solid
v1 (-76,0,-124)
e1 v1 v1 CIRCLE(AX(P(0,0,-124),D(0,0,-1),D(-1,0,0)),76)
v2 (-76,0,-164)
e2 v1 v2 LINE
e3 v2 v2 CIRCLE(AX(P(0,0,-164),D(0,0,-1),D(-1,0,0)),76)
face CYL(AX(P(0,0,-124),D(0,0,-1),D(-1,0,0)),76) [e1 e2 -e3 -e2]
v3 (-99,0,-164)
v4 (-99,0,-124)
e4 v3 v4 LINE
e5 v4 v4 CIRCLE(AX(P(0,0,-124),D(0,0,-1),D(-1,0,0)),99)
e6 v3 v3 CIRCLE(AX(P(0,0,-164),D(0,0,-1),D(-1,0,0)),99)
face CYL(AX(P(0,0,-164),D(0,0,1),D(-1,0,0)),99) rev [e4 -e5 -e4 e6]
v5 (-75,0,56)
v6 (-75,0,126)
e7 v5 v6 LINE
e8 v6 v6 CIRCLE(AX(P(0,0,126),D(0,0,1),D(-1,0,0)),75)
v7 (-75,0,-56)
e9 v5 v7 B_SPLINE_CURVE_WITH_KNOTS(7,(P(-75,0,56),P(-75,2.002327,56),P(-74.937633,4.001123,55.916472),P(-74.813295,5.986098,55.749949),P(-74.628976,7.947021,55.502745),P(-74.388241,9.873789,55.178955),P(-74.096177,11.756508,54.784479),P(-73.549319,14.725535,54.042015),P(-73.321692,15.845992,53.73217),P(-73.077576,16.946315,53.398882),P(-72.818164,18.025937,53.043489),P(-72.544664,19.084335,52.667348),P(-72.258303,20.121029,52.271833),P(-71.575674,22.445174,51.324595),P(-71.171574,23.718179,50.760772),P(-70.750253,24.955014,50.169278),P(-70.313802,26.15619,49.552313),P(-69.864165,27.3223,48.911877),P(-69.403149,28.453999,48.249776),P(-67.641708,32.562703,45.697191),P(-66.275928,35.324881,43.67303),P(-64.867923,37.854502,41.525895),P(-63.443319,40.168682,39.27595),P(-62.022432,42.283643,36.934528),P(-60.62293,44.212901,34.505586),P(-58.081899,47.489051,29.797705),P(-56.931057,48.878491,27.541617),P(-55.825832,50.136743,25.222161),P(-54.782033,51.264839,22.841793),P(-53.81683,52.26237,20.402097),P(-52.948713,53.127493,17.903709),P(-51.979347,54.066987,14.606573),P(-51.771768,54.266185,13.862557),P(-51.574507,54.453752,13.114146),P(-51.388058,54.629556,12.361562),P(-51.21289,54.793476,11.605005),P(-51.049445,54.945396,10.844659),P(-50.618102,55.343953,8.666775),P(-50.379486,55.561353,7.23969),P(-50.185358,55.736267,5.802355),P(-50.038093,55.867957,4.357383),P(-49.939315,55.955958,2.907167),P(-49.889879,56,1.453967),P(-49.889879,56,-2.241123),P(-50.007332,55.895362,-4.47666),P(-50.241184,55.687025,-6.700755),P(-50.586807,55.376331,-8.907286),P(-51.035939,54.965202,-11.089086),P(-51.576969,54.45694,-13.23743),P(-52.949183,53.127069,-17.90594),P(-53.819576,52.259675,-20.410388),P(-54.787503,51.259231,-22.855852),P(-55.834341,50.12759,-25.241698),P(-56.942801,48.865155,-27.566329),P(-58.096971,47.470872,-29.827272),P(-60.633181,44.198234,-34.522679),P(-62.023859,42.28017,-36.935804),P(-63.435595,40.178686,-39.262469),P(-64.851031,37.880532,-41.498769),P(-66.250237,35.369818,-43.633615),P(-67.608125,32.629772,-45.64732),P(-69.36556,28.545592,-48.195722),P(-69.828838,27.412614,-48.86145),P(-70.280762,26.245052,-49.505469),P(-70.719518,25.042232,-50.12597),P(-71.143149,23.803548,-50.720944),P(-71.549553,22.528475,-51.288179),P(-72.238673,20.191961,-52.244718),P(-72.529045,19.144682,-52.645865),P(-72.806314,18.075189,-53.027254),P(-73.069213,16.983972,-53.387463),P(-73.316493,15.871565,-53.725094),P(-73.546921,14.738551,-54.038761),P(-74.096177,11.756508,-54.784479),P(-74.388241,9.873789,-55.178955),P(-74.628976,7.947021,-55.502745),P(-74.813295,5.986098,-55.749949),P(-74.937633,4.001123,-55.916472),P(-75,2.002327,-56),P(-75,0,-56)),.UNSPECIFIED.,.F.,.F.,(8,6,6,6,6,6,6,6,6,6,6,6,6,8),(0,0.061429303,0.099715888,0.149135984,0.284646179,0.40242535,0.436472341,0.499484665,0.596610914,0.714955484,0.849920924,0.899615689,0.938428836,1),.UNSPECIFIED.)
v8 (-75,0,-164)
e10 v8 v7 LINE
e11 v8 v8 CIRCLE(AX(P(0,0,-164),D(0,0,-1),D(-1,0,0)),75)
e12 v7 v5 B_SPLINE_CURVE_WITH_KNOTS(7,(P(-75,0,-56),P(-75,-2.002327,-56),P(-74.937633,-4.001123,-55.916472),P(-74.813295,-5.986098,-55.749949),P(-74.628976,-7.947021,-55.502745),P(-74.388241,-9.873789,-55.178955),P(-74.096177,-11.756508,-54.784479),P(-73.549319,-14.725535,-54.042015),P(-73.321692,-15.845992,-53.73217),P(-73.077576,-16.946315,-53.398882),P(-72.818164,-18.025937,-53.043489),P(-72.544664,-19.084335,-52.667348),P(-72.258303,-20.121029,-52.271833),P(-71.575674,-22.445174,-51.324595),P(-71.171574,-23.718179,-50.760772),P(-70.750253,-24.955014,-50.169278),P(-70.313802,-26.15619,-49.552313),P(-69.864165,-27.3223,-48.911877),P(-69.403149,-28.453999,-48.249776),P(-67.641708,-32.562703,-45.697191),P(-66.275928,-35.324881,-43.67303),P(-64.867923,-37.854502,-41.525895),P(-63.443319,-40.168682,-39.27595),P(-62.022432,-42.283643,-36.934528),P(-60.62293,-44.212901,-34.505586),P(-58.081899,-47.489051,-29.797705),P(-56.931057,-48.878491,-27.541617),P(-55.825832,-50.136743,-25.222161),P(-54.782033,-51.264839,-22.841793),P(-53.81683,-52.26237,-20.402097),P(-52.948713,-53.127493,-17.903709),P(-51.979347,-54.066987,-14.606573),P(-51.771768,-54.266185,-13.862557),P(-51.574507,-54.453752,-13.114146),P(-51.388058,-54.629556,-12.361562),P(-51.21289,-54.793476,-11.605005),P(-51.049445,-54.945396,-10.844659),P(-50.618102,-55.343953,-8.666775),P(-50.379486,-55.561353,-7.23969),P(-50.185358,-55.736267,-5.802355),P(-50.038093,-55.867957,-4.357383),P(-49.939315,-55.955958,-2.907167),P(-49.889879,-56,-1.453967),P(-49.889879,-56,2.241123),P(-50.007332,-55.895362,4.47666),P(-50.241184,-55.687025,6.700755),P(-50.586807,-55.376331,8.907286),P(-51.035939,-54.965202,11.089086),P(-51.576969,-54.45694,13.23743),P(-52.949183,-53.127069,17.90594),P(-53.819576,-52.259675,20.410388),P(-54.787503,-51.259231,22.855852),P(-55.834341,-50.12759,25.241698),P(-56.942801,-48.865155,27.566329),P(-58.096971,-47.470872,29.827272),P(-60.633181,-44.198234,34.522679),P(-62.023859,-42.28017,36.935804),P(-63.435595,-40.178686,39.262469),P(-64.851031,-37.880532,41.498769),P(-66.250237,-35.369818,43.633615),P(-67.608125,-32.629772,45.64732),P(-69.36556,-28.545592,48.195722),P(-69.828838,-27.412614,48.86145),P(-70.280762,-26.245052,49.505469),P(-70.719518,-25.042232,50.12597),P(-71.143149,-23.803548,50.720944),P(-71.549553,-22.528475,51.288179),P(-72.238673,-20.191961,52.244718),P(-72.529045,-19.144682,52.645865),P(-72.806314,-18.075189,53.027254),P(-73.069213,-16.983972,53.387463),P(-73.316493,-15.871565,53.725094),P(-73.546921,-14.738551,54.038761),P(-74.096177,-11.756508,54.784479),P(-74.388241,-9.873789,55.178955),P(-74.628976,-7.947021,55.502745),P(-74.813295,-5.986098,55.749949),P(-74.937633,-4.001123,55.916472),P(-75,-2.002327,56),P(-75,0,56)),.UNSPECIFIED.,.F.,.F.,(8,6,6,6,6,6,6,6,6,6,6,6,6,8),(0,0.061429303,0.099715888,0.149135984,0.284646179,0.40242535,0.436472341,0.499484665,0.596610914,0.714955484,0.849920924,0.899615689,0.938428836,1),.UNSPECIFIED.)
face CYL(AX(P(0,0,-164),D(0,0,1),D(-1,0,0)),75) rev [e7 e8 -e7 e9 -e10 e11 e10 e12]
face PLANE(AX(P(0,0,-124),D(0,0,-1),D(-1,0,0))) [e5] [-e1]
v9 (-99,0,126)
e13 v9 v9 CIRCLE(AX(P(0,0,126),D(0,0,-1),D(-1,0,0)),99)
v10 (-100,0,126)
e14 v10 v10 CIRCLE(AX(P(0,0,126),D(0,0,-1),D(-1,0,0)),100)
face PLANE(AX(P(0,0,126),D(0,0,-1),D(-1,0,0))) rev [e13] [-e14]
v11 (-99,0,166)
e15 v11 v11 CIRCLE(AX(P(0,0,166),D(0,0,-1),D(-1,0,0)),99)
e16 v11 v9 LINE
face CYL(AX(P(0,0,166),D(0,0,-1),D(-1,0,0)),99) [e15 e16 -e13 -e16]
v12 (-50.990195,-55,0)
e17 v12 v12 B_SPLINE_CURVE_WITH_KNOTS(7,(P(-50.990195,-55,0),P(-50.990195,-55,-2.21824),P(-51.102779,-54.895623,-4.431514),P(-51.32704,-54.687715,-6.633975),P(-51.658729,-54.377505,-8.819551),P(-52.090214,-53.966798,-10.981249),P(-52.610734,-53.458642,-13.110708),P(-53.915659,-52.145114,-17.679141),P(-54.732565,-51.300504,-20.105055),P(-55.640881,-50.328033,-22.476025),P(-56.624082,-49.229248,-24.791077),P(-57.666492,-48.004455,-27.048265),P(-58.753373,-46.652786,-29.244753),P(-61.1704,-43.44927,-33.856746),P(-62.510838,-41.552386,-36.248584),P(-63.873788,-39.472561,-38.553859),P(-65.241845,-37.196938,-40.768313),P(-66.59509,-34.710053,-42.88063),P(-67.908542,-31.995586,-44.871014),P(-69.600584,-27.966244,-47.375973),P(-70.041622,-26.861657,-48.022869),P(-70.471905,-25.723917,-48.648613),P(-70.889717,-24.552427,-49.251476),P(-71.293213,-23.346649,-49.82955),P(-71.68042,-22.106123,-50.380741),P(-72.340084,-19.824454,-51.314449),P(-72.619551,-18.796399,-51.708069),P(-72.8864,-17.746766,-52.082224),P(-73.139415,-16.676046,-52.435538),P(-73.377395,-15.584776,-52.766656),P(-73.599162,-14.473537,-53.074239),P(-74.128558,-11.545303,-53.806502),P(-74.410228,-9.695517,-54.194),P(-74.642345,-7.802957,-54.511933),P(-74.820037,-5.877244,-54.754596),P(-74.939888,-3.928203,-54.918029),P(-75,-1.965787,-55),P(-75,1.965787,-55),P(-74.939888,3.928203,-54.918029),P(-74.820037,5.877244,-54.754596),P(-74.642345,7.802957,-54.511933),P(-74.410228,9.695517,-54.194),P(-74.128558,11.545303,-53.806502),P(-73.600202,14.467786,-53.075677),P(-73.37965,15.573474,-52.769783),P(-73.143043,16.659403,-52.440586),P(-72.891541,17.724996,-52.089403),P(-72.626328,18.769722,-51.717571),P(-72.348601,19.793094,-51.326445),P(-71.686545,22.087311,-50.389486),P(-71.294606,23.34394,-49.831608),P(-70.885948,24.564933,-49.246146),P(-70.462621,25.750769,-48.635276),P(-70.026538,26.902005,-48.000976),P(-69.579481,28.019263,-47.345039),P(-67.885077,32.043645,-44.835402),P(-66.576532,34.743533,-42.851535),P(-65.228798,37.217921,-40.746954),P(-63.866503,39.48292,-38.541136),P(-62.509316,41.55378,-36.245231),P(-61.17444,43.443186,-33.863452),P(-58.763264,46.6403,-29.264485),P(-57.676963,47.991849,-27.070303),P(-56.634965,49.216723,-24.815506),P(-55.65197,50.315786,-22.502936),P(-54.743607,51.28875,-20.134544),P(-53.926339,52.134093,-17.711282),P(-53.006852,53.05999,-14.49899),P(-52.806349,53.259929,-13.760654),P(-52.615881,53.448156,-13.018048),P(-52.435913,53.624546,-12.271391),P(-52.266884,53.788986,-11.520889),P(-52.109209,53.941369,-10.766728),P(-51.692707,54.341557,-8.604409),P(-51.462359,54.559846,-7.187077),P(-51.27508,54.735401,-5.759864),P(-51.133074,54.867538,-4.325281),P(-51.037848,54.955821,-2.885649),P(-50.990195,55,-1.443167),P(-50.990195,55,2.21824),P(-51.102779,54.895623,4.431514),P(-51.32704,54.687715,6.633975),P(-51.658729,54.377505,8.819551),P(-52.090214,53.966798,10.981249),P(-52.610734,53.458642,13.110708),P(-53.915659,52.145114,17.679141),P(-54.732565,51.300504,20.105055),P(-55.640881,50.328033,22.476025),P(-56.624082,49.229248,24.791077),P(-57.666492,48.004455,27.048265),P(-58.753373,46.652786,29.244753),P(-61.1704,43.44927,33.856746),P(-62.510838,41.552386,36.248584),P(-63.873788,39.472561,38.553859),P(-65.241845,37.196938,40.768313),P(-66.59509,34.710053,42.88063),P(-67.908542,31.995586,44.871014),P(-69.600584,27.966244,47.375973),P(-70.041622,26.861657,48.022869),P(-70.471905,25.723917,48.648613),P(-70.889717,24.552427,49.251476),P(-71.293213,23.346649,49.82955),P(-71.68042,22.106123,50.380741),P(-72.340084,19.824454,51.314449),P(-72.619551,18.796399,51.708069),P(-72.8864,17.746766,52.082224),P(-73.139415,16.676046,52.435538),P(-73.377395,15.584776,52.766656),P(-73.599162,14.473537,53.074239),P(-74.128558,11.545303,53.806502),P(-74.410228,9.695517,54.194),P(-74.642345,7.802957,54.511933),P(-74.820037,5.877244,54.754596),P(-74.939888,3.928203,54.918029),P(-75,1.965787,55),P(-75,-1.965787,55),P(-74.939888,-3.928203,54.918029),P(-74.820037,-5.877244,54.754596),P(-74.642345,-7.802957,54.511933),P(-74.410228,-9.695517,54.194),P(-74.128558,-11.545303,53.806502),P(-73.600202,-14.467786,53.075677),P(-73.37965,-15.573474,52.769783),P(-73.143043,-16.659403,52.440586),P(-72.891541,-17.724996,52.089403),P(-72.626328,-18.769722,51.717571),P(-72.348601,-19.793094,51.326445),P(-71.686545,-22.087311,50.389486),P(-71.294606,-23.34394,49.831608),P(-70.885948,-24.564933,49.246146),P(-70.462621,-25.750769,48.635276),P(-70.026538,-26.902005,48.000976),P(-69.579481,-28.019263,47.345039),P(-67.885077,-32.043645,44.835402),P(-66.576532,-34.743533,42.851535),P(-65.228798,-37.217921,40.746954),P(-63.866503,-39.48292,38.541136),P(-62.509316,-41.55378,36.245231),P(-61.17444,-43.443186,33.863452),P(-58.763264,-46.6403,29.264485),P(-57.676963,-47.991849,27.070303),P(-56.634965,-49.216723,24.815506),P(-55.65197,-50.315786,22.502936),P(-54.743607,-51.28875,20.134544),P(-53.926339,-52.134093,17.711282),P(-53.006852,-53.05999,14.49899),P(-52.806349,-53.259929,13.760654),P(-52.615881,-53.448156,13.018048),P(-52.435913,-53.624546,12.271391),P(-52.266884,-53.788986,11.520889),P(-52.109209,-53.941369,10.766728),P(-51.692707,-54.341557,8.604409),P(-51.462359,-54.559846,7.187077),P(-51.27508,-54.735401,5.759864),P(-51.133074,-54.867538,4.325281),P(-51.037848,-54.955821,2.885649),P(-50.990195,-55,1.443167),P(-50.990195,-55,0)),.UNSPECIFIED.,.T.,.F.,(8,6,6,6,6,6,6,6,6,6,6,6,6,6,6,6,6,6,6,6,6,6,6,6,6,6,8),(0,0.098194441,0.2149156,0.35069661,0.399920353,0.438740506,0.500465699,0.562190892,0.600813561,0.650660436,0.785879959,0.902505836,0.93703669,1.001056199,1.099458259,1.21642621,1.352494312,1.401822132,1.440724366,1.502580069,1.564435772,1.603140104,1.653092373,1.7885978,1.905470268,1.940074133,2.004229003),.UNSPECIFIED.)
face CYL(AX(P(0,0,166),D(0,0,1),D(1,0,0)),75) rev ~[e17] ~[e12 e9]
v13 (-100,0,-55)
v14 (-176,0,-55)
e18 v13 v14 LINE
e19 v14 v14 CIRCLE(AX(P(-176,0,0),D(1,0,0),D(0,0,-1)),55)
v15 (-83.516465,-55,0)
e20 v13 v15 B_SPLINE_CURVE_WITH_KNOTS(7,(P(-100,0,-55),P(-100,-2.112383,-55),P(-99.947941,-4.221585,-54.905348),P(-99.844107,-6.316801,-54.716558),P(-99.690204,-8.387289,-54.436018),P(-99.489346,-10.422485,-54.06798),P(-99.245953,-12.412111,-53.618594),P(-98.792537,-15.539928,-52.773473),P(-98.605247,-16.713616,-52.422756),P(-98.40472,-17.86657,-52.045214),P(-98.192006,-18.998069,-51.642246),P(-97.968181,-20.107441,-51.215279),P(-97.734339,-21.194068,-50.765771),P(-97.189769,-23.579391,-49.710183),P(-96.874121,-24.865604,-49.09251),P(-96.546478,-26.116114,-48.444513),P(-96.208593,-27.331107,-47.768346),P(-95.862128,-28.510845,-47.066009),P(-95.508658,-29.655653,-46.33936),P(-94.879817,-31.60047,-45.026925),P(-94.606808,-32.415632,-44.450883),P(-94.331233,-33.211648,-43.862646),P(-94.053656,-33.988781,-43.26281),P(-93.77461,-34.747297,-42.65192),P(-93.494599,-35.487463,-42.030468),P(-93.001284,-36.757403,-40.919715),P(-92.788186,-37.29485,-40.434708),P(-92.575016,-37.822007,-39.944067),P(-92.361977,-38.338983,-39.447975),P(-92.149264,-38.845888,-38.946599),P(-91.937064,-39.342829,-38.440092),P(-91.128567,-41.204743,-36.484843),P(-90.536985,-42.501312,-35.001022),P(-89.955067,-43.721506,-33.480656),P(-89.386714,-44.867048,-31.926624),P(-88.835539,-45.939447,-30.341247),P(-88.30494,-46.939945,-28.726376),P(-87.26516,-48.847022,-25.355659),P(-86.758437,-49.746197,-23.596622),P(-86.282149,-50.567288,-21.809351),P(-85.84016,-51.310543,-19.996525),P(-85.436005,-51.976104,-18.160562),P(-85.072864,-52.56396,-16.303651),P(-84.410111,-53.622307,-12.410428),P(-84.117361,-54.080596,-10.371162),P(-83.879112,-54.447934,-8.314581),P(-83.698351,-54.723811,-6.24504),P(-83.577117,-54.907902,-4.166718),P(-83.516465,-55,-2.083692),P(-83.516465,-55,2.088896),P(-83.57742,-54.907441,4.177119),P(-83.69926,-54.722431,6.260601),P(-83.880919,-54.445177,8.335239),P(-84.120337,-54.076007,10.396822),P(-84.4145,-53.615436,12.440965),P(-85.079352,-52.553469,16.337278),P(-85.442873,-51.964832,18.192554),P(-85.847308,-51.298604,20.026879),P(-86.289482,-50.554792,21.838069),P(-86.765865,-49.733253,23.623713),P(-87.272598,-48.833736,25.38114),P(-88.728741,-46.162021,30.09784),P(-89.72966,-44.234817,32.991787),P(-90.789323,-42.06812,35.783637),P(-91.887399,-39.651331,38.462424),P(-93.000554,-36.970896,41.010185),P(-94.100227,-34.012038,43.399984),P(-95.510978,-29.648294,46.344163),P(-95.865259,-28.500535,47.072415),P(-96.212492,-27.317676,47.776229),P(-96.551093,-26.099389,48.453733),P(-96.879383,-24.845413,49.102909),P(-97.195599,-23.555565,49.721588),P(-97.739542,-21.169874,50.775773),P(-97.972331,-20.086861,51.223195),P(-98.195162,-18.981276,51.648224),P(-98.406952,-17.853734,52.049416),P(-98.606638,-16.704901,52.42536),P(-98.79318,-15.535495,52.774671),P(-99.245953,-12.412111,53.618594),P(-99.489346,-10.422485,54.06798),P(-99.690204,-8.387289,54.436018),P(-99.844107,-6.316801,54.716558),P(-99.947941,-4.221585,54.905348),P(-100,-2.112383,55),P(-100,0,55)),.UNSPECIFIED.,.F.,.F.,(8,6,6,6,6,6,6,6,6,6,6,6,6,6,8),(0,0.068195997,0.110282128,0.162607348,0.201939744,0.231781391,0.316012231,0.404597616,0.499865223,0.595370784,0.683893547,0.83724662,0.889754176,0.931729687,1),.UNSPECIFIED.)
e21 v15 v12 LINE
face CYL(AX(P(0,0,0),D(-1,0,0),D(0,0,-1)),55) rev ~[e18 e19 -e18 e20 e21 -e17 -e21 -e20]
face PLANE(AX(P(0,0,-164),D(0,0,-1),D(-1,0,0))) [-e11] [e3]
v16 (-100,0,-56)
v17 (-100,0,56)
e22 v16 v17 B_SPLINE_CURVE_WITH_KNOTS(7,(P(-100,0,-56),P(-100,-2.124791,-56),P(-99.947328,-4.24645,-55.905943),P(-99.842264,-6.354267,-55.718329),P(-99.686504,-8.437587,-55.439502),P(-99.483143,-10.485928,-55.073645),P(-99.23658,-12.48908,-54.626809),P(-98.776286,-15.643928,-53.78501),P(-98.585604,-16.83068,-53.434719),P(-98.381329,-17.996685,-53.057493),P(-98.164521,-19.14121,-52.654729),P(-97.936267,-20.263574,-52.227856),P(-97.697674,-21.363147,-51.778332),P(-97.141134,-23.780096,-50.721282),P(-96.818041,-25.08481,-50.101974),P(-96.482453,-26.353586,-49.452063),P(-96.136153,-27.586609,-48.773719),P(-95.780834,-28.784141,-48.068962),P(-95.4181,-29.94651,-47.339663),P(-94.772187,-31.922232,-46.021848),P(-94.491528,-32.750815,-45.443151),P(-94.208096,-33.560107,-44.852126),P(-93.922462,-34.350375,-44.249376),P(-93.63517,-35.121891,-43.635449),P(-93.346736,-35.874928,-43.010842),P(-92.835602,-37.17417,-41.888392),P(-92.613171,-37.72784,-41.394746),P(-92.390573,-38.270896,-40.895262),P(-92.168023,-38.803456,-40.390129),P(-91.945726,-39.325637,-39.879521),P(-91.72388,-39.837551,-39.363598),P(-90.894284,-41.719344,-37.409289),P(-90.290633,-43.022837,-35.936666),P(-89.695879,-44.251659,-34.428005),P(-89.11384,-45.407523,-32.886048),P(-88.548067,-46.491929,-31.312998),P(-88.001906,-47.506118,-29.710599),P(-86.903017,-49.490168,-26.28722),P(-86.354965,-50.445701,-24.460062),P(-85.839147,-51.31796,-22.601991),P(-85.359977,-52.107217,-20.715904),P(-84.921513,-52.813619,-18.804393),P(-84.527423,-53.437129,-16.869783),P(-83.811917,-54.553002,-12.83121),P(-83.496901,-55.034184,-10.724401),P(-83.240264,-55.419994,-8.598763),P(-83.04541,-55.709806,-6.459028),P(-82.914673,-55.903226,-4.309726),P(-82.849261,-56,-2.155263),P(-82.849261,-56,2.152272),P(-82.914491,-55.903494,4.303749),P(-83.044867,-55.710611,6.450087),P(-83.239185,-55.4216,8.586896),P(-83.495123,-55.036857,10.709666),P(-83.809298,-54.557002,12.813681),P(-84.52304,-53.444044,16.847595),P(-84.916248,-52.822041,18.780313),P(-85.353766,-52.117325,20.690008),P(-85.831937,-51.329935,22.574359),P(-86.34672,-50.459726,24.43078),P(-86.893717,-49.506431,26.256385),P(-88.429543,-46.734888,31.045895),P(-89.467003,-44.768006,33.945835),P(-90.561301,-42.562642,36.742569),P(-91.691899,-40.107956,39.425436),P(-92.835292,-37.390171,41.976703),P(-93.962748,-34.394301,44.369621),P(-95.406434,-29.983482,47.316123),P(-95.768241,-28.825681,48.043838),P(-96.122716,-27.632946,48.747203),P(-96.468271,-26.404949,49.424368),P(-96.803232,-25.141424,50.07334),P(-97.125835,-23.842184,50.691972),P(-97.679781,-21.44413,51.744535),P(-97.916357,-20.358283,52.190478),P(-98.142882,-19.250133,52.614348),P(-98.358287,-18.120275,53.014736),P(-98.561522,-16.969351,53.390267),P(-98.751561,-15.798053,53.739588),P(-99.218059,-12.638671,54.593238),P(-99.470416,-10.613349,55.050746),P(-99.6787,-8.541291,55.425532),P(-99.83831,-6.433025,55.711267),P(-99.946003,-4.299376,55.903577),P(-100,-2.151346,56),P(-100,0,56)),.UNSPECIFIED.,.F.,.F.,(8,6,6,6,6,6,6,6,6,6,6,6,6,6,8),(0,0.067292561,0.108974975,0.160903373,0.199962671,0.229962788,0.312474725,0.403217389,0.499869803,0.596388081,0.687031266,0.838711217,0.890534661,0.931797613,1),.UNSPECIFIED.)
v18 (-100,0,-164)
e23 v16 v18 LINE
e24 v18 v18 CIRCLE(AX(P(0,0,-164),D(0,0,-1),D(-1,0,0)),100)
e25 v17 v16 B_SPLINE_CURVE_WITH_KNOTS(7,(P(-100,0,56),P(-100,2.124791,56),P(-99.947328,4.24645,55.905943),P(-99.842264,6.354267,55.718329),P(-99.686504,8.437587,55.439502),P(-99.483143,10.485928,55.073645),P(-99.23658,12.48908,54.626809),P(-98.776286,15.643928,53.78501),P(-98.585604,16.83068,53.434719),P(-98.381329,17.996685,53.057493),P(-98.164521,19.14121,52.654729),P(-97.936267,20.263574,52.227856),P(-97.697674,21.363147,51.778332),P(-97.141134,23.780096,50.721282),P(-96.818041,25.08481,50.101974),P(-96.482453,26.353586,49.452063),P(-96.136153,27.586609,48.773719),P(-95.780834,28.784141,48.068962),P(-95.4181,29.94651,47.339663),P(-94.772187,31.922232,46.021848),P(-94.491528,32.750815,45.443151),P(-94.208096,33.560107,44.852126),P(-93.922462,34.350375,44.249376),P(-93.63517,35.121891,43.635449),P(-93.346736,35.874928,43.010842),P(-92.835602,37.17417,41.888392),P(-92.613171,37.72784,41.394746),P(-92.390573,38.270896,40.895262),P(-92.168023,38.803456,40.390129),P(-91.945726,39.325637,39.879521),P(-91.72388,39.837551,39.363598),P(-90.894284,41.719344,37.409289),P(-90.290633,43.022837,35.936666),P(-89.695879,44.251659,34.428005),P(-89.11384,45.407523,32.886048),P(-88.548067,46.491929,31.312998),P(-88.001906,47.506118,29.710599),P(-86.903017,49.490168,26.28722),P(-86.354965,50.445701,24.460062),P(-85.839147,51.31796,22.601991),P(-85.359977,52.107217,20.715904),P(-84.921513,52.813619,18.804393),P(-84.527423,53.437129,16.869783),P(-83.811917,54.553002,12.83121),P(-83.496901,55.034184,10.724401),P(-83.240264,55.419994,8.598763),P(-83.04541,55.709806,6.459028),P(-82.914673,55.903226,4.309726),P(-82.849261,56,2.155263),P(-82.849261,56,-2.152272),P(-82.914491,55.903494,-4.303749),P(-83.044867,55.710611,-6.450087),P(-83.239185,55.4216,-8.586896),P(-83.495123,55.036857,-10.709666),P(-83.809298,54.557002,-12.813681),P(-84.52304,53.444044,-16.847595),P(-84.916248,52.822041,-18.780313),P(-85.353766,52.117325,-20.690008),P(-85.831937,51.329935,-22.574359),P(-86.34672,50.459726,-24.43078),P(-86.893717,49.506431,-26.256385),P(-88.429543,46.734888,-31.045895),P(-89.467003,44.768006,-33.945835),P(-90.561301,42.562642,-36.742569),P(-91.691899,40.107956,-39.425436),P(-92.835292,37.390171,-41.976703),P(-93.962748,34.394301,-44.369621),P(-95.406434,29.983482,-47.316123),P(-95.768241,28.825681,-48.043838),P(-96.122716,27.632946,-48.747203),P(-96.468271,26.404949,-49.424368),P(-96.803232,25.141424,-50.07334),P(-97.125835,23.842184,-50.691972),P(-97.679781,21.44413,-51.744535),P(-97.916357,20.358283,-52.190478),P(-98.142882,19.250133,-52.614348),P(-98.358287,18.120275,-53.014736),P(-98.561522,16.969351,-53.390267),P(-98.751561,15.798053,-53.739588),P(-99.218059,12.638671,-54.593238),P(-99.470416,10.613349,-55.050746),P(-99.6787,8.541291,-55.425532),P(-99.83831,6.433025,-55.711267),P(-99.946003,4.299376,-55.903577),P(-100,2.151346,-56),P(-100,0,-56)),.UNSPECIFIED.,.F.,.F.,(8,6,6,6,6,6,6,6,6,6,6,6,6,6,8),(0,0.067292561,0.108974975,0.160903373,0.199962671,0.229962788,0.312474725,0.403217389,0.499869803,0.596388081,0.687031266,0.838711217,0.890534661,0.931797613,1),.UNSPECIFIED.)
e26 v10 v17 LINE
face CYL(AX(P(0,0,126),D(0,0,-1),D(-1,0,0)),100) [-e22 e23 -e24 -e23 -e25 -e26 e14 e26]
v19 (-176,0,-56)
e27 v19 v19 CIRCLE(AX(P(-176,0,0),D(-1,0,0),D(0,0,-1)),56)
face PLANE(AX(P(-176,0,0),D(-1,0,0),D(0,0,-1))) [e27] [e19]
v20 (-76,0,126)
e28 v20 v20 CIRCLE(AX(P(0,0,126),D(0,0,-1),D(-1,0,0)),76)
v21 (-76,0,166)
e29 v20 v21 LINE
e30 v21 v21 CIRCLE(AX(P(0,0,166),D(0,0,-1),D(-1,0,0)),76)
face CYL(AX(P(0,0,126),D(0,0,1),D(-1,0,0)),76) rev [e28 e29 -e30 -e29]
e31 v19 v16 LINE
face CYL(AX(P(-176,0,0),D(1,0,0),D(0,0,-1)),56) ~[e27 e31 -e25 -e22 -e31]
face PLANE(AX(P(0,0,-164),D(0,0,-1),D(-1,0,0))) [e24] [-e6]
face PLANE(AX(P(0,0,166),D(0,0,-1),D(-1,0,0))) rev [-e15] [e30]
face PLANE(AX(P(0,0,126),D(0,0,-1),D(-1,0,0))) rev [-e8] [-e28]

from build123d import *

# Parameters (mm, degrees)
F0_W     = 25
F0_H     = 1
F0_W_2   = 76
F0_W_3   = 75
F3_R     = 55
F4_DEPTH = 176
F5_R     = 75
F6_DEPTH = 1200


# Not quite as in the source:
# - a feature names something its author has since deleted; it is built from what else it names


with BuildPart() as f1:
    # F0 (on Front) → F1 (revolve)
    with BuildSketch(Plane.XZ):
        Polygon((-100, -55), (-75, -55), (-75, 126), (-76, 126), (-76, 166), (-99, 166), (-99, 126), (-100, 126), align=None)
        with Locations((-87.5, -55.5)):
            Rectangle(F0_W, F0_H)
        Polygon((-76, -164), (-75, -164), (-75, -56), (-100, -56), (-100, -164), (-99, -164), (-99, -124), (-76, -124), align=None)
    revolve(axis=Axis((0, 0, -35.4669196472), (0, 0, -1)))

    # F0 (on Front) → F2 (revolve)
    with BuildSketch(Plane.XZ):
        with Locations((-138, -55.5)):
            Rectangle(F0_W_2, F0_H)
        with Locations((-87.5, -55.5)):
            Rectangle(F0_W, F0_H)
        with Locations((-37.5, -55.5)):
            Rectangle(F0_W_3, F0_H)
    revolve(axis=Axis((-175, 0, 0), (-1, 0, 0)))

    # F3 (on face) → F4 (cut, through all)
    with BuildSketch(Plane(origin=(-176, 0, 0), x_dir=(0, -1, 0), z_dir=(-1, 0, 0))):
        Circle(F3_R)
    extrude(amount=-F4_DEPTH, mode=Mode.SUBTRACT)

    # F5 (on face) → F6 (cut)
    with BuildSketch(Plane.XY.offset(166)):
        Circle(F5_R)
    extrude(amount=-F6_DEPTH, mode=Mode.SUBTRACT)


solid = f1.part
